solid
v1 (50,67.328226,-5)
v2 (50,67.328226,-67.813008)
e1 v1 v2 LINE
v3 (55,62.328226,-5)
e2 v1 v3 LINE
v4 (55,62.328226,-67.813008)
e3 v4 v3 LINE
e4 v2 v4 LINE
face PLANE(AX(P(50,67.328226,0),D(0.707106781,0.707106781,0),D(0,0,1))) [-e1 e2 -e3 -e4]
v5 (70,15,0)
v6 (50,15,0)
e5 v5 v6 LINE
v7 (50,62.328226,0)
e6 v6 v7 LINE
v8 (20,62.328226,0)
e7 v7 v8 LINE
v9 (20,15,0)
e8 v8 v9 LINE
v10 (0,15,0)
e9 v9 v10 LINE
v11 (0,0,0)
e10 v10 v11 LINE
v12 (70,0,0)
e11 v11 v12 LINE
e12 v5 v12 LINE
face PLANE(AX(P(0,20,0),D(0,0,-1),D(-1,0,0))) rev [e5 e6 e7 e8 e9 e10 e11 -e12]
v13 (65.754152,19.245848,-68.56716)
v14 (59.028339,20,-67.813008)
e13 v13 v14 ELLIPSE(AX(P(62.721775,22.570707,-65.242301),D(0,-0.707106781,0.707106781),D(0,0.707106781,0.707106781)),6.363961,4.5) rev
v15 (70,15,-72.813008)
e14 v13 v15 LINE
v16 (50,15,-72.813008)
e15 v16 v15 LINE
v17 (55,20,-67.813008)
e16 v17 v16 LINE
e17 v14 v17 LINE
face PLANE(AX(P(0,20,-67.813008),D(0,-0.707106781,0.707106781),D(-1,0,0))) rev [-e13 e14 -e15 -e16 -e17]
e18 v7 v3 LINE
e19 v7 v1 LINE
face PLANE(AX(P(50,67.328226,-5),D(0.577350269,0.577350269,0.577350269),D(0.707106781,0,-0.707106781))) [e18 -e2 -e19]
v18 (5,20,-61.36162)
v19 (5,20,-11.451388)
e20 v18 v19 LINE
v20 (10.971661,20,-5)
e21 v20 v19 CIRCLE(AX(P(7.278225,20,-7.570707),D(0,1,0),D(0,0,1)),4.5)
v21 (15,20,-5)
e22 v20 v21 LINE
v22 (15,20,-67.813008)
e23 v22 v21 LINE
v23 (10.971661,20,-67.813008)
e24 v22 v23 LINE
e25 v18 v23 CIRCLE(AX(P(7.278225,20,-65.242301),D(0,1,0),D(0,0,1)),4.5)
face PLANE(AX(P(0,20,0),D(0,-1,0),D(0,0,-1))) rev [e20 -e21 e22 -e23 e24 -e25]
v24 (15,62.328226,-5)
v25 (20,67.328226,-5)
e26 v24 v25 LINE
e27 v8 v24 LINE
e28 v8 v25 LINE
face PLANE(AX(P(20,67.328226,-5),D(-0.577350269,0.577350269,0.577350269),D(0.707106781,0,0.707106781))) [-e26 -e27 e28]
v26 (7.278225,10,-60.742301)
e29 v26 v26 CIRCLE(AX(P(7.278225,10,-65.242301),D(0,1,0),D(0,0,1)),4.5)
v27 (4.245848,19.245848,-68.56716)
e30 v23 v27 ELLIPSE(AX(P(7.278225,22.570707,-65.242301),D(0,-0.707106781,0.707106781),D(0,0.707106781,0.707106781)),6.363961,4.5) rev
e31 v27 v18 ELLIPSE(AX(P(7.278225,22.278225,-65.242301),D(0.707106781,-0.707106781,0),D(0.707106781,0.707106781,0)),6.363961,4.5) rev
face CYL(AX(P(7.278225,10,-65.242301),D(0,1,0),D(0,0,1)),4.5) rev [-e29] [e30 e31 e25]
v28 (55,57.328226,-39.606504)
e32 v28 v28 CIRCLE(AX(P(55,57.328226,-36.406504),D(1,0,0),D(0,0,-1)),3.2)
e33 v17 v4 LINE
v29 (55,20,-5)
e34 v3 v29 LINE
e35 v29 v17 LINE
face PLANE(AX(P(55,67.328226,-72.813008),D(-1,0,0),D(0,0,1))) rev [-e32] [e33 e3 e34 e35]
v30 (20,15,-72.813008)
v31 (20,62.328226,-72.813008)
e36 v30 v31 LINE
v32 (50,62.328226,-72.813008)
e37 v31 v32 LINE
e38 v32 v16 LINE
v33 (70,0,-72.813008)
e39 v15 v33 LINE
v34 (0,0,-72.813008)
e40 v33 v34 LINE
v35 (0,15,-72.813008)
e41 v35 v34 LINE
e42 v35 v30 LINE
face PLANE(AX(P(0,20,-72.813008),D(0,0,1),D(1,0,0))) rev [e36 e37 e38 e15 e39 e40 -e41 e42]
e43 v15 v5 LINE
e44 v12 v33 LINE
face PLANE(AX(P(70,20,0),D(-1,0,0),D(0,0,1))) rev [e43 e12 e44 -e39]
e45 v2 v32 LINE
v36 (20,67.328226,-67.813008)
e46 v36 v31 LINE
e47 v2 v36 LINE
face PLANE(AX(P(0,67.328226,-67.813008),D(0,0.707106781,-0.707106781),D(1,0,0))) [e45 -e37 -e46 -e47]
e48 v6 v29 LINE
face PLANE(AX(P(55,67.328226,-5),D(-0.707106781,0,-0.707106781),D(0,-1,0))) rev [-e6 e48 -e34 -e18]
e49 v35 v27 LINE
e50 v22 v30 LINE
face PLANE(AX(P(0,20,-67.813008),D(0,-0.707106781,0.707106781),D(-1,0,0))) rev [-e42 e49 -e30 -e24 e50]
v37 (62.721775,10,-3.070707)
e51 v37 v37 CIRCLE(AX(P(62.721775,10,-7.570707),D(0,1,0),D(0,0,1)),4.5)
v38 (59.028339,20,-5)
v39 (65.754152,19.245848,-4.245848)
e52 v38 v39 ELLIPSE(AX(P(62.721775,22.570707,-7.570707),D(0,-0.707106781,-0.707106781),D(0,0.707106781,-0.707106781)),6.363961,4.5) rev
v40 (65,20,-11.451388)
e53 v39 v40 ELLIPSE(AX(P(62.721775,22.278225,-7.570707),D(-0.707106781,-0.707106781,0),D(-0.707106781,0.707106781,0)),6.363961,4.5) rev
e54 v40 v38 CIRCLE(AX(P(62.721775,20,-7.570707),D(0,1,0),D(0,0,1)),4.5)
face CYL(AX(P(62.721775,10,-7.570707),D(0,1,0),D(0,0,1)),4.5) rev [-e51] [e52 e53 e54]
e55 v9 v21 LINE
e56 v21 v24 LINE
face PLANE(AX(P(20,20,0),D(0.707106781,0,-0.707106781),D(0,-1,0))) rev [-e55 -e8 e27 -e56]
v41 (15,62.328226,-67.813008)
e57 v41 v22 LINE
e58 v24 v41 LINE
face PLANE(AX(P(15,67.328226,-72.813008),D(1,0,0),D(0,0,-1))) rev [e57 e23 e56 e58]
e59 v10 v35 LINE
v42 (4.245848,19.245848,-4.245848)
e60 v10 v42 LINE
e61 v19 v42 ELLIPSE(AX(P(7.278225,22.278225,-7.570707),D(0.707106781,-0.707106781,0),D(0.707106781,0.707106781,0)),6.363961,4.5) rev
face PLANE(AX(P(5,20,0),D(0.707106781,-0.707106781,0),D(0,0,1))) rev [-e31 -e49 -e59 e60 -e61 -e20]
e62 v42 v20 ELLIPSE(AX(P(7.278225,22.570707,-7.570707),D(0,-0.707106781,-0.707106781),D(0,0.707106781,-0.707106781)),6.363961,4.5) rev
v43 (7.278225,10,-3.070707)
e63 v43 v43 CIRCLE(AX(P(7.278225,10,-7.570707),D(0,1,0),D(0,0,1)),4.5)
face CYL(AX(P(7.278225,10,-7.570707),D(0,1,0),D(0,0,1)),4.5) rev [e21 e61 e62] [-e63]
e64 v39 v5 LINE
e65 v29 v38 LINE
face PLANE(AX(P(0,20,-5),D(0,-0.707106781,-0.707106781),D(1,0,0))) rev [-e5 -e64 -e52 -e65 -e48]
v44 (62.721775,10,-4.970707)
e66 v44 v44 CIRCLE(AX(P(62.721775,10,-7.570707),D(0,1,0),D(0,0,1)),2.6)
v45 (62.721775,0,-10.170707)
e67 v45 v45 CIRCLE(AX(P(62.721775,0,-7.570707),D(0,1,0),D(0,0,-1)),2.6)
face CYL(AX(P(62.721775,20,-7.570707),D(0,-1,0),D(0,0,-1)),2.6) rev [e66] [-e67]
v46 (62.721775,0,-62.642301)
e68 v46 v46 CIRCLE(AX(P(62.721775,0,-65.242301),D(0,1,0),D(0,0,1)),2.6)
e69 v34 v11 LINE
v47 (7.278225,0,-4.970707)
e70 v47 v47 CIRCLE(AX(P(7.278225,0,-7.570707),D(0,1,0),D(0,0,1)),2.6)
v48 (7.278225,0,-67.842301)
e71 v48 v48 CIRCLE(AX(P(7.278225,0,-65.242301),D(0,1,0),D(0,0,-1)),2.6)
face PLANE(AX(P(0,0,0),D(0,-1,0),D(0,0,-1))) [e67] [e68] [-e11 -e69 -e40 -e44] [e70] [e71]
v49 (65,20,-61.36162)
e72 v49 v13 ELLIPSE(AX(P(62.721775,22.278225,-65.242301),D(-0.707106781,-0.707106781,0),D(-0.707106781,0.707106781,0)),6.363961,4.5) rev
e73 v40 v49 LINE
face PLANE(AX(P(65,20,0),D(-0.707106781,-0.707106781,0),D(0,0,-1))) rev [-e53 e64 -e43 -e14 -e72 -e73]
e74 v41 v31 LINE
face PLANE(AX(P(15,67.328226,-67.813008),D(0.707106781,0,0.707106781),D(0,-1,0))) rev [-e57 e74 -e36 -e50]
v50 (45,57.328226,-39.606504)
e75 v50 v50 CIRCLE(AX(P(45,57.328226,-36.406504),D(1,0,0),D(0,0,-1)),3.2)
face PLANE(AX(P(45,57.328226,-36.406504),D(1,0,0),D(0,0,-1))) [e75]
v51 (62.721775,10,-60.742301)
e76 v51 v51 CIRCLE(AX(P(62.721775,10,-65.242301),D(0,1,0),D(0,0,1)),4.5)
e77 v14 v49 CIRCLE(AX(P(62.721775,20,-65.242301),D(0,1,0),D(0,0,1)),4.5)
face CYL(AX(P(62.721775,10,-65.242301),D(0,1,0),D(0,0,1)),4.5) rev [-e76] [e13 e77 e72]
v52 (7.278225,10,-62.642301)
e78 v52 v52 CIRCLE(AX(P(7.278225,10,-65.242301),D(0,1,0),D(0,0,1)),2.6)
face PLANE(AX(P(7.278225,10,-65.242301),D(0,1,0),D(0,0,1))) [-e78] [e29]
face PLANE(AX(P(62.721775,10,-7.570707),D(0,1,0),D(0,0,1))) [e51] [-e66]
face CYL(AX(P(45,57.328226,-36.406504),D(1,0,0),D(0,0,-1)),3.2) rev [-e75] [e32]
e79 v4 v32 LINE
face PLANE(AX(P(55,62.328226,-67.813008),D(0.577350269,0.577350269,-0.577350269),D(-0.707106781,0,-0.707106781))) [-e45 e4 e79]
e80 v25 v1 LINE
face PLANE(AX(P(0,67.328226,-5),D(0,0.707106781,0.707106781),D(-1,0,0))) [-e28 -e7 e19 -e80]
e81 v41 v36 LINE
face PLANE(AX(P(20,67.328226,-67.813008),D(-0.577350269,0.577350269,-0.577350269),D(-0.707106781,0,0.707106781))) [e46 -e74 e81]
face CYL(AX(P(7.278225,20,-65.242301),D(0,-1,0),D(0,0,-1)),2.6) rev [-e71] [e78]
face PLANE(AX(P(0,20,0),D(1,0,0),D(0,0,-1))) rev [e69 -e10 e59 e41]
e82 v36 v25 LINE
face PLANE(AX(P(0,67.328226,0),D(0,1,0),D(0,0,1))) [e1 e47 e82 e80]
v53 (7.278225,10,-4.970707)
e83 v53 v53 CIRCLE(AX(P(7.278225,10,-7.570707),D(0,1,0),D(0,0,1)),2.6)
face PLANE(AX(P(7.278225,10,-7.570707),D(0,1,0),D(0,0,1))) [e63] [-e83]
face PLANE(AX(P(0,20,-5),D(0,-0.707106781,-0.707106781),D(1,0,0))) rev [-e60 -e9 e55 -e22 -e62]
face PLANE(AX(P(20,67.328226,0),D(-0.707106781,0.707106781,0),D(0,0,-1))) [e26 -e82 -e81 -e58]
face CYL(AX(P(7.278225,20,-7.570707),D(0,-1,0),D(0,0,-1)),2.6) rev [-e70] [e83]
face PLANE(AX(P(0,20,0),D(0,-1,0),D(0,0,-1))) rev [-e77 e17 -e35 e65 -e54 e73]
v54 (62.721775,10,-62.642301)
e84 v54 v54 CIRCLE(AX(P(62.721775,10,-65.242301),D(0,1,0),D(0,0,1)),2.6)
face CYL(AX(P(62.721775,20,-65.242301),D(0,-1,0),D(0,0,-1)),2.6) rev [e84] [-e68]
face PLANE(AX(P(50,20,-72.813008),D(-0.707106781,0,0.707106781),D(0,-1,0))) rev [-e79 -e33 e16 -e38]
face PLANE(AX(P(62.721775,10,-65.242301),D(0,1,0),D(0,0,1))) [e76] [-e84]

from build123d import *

# Parameters (mm, degrees)
SKETCH1_W           = 70
SKETCH1_H           = 72.813008
SKETCH1_R           = 2.6
BOSS_EXTRUDE1_DEPTH = 20
SKETCH2_R           = 4.5
CUT_EXTRUDE1_DEPTH  = 10
SKETCH3_W           = 40
SKETCH3_H           = 72.813008
BOSS_EXTRUDE2_DEPTH = 47.328226
SKETCH5_R           = 3.2
CUT_EXTRUDE2_DEPTH  = 10


with BuildPart() as part:
    # Sketch1 → Boss-Extrude1 (new body)
    with BuildSketch(Plane(origin=(0, 0, 0), x_dir=(1, 0, 0), z_dir=(0, 1, 0))):
        with Locations((35, 36.406504)):
            Rectangle(SKETCH1_W, SKETCH1_H)
        with Locations(Location((62.721774771, 65.242301259, 0), (0, 0, 270))):
            Circle(SKETCH1_R, mode=Mode.SUBTRACT)
        with Locations(Location((7.278225229, 65.242301259, 0), (0, 0, 90))):
            Circle(SKETCH1_R, mode=Mode.SUBTRACT)
        with Locations(Location((62.721774771, 7.570706741, 0), (0, 0, 90))):
            Circle(SKETCH1_R, mode=Mode.SUBTRACT)
        with Locations(Location((7.278225229, 7.570706741, 0), (0, 0, 270))):
            Circle(SKETCH1_R, mode=Mode.SUBTRACT)
    extrude(amount=BOSS_EXTRUDE1_DEPTH)

    # Sketch2 → Cut-Extrude1 (cut)
    with BuildSketch(Plane(origin=(0, 20, 0), x_dir=(1, 0, 0), z_dir=(0, 1, 0))):
        with Locations(Location((62.721774771, 65.242301259, 0), (0, 0, 270))):
            Circle(SKETCH2_R)
        with Locations(Location((7.278225229, 65.242301259, 0), (0, 0, 270))):
            Circle(SKETCH2_R)
        with Locations(Location((7.278225229, 7.570706741, 0), (0, 0, 270))):
            Circle(SKETCH2_R)
        with Locations(Location((62.721774771, 7.570706741, 0), (0, 0, 270))):
            Circle(SKETCH2_R)
    extrude(amount=-CUT_EXTRUDE1_DEPTH, mode=Mode.SUBTRACT)

    # Sketch3 → Boss-Extrude2 (add)
    with BuildSketch(Plane(origin=(0, 20, 0), x_dir=(1, 0, 0), z_dir=(0, 1, 0))):
        with Locations((35, 36.406504)):
            Rectangle(SKETCH3_W, SKETCH3_H)
    extrude(amount=BOSS_EXTRUDE2_DEPTH)

    # Sketch5 → Cut-Extrude2 (cut)
    with BuildSketch(Plane(origin=(55, 0, 0), x_dir=(0, 0, -1), z_dir=(1, 0, 0))):
        with Locations((36.406504, 57.328226)):
            Circle(SKETCH5_R)
    extrude(amount=-CUT_EXTRUDE2_DEPTH, mode=Mode.SUBTRACT)

    # Chamfer1
    # the kernel refuses this chamfer: 5 mm, written as the material it takes off along each edge
    with BuildSketch(Plane(origin=(51.666666667, 63.994892667, -3.333333333), x_dir=(0, 0.7071067811865475, -0.7071067811865475), z_dir=(0.5773502691896257, 0.5773502691896257, 0.5773502691896257)), Plane(origin=(18.333333333, 63.994892667, -3.333333333), x_dir=(-0.7071067811865475, 0, -0.7071067811865475), z_dir=(-0.5773502691896257, 0.5773502691896257, 0.5773502691896257))) as chamfer1_piece_1:
        Polygon((-3.535533906, 2.041241452), (3.535533906, 2.041241452), (0, -4.082482905), align=None)
    extrude(amount=6.350852961, mode=Mode.SUBTRACT)
    with BuildSketch(Plane(origin=(51.666666667, 63.994892667, -69.479674667), x_dir=(0, 0.7071067811865475, 0.7071067811865475), z_dir=(0.5773502691896257, 0.5773502691896257, -0.5773502691896257)), Plane(origin=(18.333333333, 63.994892667, -69.479674667), x_dir=(-0.7071067811865472, 0, 0.7071067811865478), z_dir=(-0.5773502691896258, 0.5773502691896258, -0.5773502691896255))) as chamfer1_piece_2:
        Polygon((-3.535533906, -2.041241452), (3.535533906, -2.041241452), (0, 4.082482905), align=None)
    extrude(amount=6.350852961, mode=Mode.SUBTRACT)
    with BuildSketch(Plane(origin=(70, 20, 12.85841494), x_dir=(-0.9996219169112968, 0.027495876610586282, 0), z_dir=(0, 0, -1)), Plane(origin=(15, 67.328226, 12.85841494), x_dir=(-0.027495876610586317, -0.9996219169112968, 0), z_dir=(0, 0, -1))) as chamfer1_piece_3:
        with BuildLine():
            Line((5.143365976, 0), (-0.282735774, -5.135588968))
            Line((-0.282735774, -5.135588968), (-0.382697966, -5.13283938))
            ThreePointArc((-0.382697966, -5.13283938), (-0.170646135, -2.566989148), (-0.099962192, 0.002749588))
            Line((-0.099962192, 0.002749588), (0.002749588, 0.099962192))
            ThreePointArc((0.002749588, 0.099962192), (2.572488324, 0.029278248), (5.146115564, 0.099962192))
            Line((5.146115564, 0.099962192), (5.143365976, 0))
        make_face()
    extrude(amount=98.52983788, mode=Mode.SUBTRACT)
    with BuildSketch(Plane(origin=(82.85841494, 20, -72.813008), x_dir=(0, 0.027495876610586282, 0.9996219169112968), z_dir=(-1, 0, 0)), Plane(origin=(15, 20, -72.813008), x_dir=(0, 0.027495876610586282, 0.9996219169112968), z_dir=(-1, 0, 0))) as chamfer1_piece_4:
        with BuildLine():
            Line((5.143365976, 0), (-0.282735774, -5.135588968))
            Line((-0.282735774, -5.135588968), (-0.382697966, -5.13283938))
            ThreePointArc((-0.382697966, -5.13283938), (-0.170646135, -2.566989148), (-0.099962192, 0.002749588))
            Line((-0.099962192, 0.002749588), (0.002749588, 0.099962192))
            ThreePointArc((0.002749588, 0.099962192), (2.572488324, 0.029278248), (5.146115564, 0.099962192))
            Line((5.146115564, 0.099962192), (5.143365976, 0))
        make_face()
    extrude(amount=27.85841494, mode=Mode.SUBTRACT)
    with BuildSketch(Plane(origin=(0, 20, -85.67142294), x_dir=(-0.027495876610586372, -0.9996219169112968, 0), z_dir=(0, 0, 1)), Plane(origin=(55, 67.328226, -85.67142294), x_dir=(-0.9996219169112968, 0.0274958766105877, 0), z_dir=(0, 0, 1))) as chamfer1_piece_5:
        with BuildLine():
            Line((5.143365976, 0), (-0.282735774, 5.135588968))
            Line((-0.282735774, 5.135588968), (-0.382697966, 5.13283938))
            ThreePointArc((-0.382697966, 5.13283938), (-0.170646135, 2.566989148), (-0.099962192, -0.002749588))
            Line((-0.099962192, -0.002749588), (0.002749588, -0.099962192))
            ThreePointArc((0.002749588, -0.099962192), (2.572488324, -0.029278248), (5.146115564, -0.099962192))
            Line((5.146115564, -0.099962192), (5.143365976, 0))
        make_face()
    extrude(amount=98.52983788, mode=Mode.SUBTRACT)
    with BuildSketch(Plane(origin=(55, 20, 0), x_dir=(0, -0.9996219169112968, 0.027495876610586372), z_dir=(1, 0, 0)), Plane(origin=(-12.85841494, 20, 0), x_dir=(0, -0.9996219169112968, 0.027495876610586372), z_dir=(1, 0, 0))) as chamfer1_piece_6:
        with BuildLine():
            Line((5.143365976, 0), (-0.282735774, 5.135588968))
            Line((-0.282735774, 5.135588968), (-0.382697966, 5.13283938))
            ThreePointArc((-0.382697966, 5.13283938), (-0.170646135, 2.566989148), (-0.099962192, -0.002749588))
            Line((-0.099962192, -0.002749588), (0.002749588, -0.099962192))
            ThreePointArc((0.002749588, -0.099962192), (2.572488324, -0.029278248), (5.146115564, -0.099962192))
            Line((5.146115564, -0.099962192), (5.143365976, 0))
        make_face()
    extrude(amount=27.85841494, mode=Mode.SUBTRACT)
    with BuildSketch(Plane(origin=(55, 20, 0), x_dir=(-0.9996219169112968, 0, 0.027495876610586372), z_dir=(0, 1, 0)), Plane(origin=(55, 20, -72.813008), x_dir=(0.027495876610586282, 0, 0.9996219169112968), z_dir=(0, 1, 0))) as chamfer1_piece_7:
        with BuildLine():
            Line((5.143365976, 0), (-0.282735774, -5.135588968))
            Line((-0.282735774, -5.135588968), (-0.382697966, -5.13283938))
            ThreePointArc((-0.382697966, -5.13283938), (-0.170646135, -2.566989148), (-0.099962192, 0.002749588))
            Line((-0.099962192, 0.002749588), (0.002749588, 0.099962192))
            ThreePointArc((0.002749588, 0.099962192), (2.572488324, 0.029278248), (5.146115564, 0.099962192))
            Line((5.146115564, 0.099962192), (5.143365976, 0))
        make_face()
    extrude(amount=60.18664094, mode=Mode.SUBTRACT)
    with BuildSketch(Plane(origin=(15, 20, -72.813008), x_dir=(-0.027495876610586282, 0, 0.9996219169112968), z_dir=(0, 1, 0)), Plane(origin=(15, 20, 0), x_dir=(0.9996219169112968, 0, 0.027495876610586372), z_dir=(0, 1, 0))) as chamfer1_piece_8:
        with BuildLine():
            Line((5.143365976, 0), (-0.282735774, 5.135588968))
            Line((-0.282735774, 5.135588968), (-0.382697966, 5.13283938))
            ThreePointArc((-0.382697966, 5.13283938), (-0.170646135, 2.566989148), (-0.099962192, -0.002749588))
            Line((-0.099962192, -0.002749588), (0.002749588, -0.099962192))
            ThreePointArc((0.002749588, -0.099962192), (2.572488324, -0.029278248), (5.146115564, -0.099962192))
            Line((5.146115564, -0.099962192), (5.143365976, 0))
        make_face()
    extrude(amount=60.18664094, mode=Mode.SUBTRACT)
    with BuildSketch(Plane(origin=(2.14158506, 67.328226, -72.813008), x_dir=(0, 0.027495876610587663, 0.9996219169112968), z_dir=(1, 0, 0))) as chamfer1_piece_9:
        with BuildLine():
            Line((5.143365976, 0), (-0.282735774, 5.135588968))
            Line((-0.282735774, 5.135588968), (-0.382697966, 5.13283938))
            ThreePointArc((-0.382697966, 5.13283938), (-0.170646135, 2.566989148), (-0.099962192, -0.002749588))
            Line((-0.099962192, -0.002749588), (0.002749588, -0.099962192))
            ThreePointArc((0.002749588, -0.099962192), (2.572488324, -0.029278248), (5.146115564, -0.099962192))
            Line((5.146115564, -0.099962192), (5.143365976, 0))
        make_face()
    extrude(amount=65.71682988, mode=Mode.SUBTRACT)
    with BuildSketch(Plane(origin=(67.85841494, 67.328226, 0), x_dir=(0, -0.9996219169112968, 0.027495876610586372), z_dir=(-1, 0, 0))) as chamfer1_piece_10:
        with BuildLine():
            Line((5.143365976, 0), (-0.282735774, -5.135588968))
            Line((-0.282735774, -5.135588968), (-0.382697966, -5.13283938))
            ThreePointArc((-0.382697966, -5.13283938), (-0.170646135, -2.566989148), (-0.099962192, 0.002749588))
            Line((-0.099962192, 0.002749588), (0.002749588, 0.099962192))
            ThreePointArc((0.002749588, 0.099962192), (2.572488324, 0.029278248), (5.146115564, 0.099962192))
            Line((5.146115564, 0.099962192), (5.143365976, 0))
        make_face()
    extrude(amount=65.71682988, mode=Mode.SUBTRACT)
    with BuildSketch(Plane(origin=(55, 7.14158506, -72.813008), x_dir=(0.027495876610586282, 0, 0.9996219169112968), z_dir=(0, 1, 0))) as chamfer1_piece_11a_section:
        with BuildLine():
            Line((5.143365976, 0), (-0.282735774, -5.135588968))
            Line((-0.282735774, -5.135588968), (-0.382697966, -5.13283938))
            ThreePointArc((-0.382697966, -5.13283938), (-0.170646135, -2.566989148), (-0.099962192, 0.002749588))
            Line((-0.099962192, 0.002749588), (0.002749588, 0.099962192))
            ThreePointArc((0.002749588, 0.099962192), (2.572488324, 0.029278248), (5.146115564, 0.099962192))
            Line((5.146115564, 0.099962192), (5.143365976, 0))
        make_face()
    chamfer1_piece_11a = extrude(amount=73.04505588, mode=Mode.PRIVATE)
    chamfer1_piece_11a = split(chamfer1_piece_11a, bisect_by=Plane(origin=(53.351031866, 20, -71.164039866), z_dir=(0, -1, 0)), keep=Keep.TOP, mode=Mode.PRIVATE)
    with BuildSketch(Plane(origin=(82.85841494, 20, -72.813008), x_dir=(0, 0.027495876610586282, 0.9996219169112968), z_dir=(-1, 0, 0))) as chamfer1_piece_11b_section:
        with BuildLine():
            Line((5.143365976, 0), (-0.282735774, -5.135588968))
            Line((-0.282735774, -5.135588968), (-0.382697966, -5.13283938))
            ThreePointArc((-0.382697966, -5.13283938), (-0.170646135, -2.566989148), (-0.099962192, 0.002749588))
            Line((-0.099962192, 0.002749588), (0.002749588, 0.099962192))
            ThreePointArc((0.002749588, 0.099962192), (2.572488324, 0.029278248), (5.146115564, 0.099962192))
            Line((5.146115564, 0.099962192), (5.143365976, 0))
        make_face()
    chamfer1_piece_11b = extrude(amount=40.71682988, mode=Mode.PRIVATE)
    chamfer1_piece_11b = split(chamfer1_piece_11b, bisect_by=Plane(origin=(55, 18.351031866, -71.164039866), z_dir=(-1, 0, 0)), keep=Keep.TOP, mode=Mode.PRIVATE)
    chamfer1_piece_11 = chamfer1_piece_11a & chamfer1_piece_11b
    add(chamfer1_piece_11, mode=Mode.SUBTRACT)
    with BuildSketch(Plane(origin=(55, 7.14158506, 0), x_dir=(-0.9996219169112968, 0, 0.027495876610586372), z_dir=(0, 1, 0))) as chamfer1_piece_12a_section:
        with BuildLine():
            Line((5.143365976, 0), (-0.282735774, -5.135588968))
            Line((-0.282735774, -5.135588968), (-0.382697966, -5.13283938))
            ThreePointArc((-0.382697966, -5.13283938), (-0.170646135, -2.566989148), (-0.099962192, 0.002749588))
            Line((-0.099962192, 0.002749588), (0.002749588, 0.099962192))
            ThreePointArc((0.002749588, 0.099962192), (2.572488324, 0.029278248), (5.146115564, 0.099962192))
            Line((5.146115564, 0.099962192), (5.143365976, 0))
        make_face()
    chamfer1_piece_12a = extrude(amount=73.04505588, mode=Mode.PRIVATE)
    chamfer1_piece_12a = split(chamfer1_piece_12a, bisect_by=Plane(origin=(53.351031866, 20, -1.648968134), z_dir=(0, -1, 0)), keep=Keep.TOP, mode=Mode.PRIVATE)
    with BuildSketch(Plane(origin=(42.14158506, 20, 0), x_dir=(0, -0.9996219169112968, 0.027495876610586372), z_dir=(1, 0, 0))) as chamfer1_piece_12b_section:
        with BuildLine():
            Line((5.143365976, 0), (-0.282735774, 5.135588968))
            Line((-0.282735774, 5.135588968), (-0.382697966, 5.13283938))
            ThreePointArc((-0.382697966, 5.13283938), (-0.170646135, 2.566989148), (-0.099962192, -0.002749588))
            Line((-0.099962192, -0.002749588), (0.002749588, -0.099962192))
            ThreePointArc((0.002749588, -0.099962192), (2.572488324, -0.029278248), (5.146115564, -0.099962192))
            Line((5.146115564, -0.099962192), (5.143365976, 0))
        make_face()
    chamfer1_piece_12b = extrude(amount=40.71682988, mode=Mode.PRIVATE)
    chamfer1_piece_12b = split(chamfer1_piece_12b, bisect_by=Plane(origin=(55, 18.351031866, -1.648968134), z_dir=(-1, 0, 0)), keep=Keep.TOP, mode=Mode.PRIVATE)
    chamfer1_piece_12 = chamfer1_piece_12a & chamfer1_piece_12b
    add(chamfer1_piece_12, mode=Mode.SUBTRACT)
    with BuildSketch(Plane(origin=(27.85841494, 20, -72.813008), x_dir=(0, 0.027495876610586282, 0.9996219169112968), z_dir=(-1, 0, 0))) as chamfer1_piece_13a_section:
        with BuildLine():
            Line((5.143365976, 0), (-0.282735774, -5.135588968))
            Line((-0.282735774, -5.135588968), (-0.382697966, -5.13283938))
            ThreePointArc((-0.382697966, -5.13283938), (-0.170646135, -2.566989148), (-0.099962192, 0.002749588))
            Line((-0.099962192, 0.002749588), (0.002749588, 0.099962192))
            ThreePointArc((0.002749588, 0.099962192), (2.572488324, 0.029278248), (5.146115564, 0.099962192))
            Line((5.146115564, 0.099962192), (5.143365976, 0))
        make_face()
    chamfer1_piece_13a = extrude(amount=40.71682988, mode=Mode.PRIVATE)
    chamfer1_piece_13a = split(chamfer1_piece_13a, bisect_by=Plane(origin=(15, 18.351031866, -71.164039866), z_dir=(1, 0, 0)), keep=Keep.TOP, mode=Mode.PRIVATE)
    with BuildSketch(Plane(origin=(15, 7.14158506, -72.813008), x_dir=(-0.027495876610586282, 0, 0.9996219169112968), z_dir=(0, 1, 0))) as chamfer1_piece_13b_section:
        with BuildLine():
            Line((5.143365976, 0), (-0.282735774, 5.135588968))
            Line((-0.282735774, 5.135588968), (-0.382697966, 5.13283938))
            ThreePointArc((-0.382697966, 5.13283938), (-0.170646135, 2.566989148), (-0.099962192, -0.002749588))
            Line((-0.099962192, -0.002749588), (0.002749588, -0.099962192))
            ThreePointArc((0.002749588, -0.099962192), (2.572488324, -0.029278248), (5.146115564, -0.099962192))
            Line((5.146115564, -0.099962192), (5.143365976, 0))
        make_face()
    chamfer1_piece_13b = extrude(amount=73.04505588, mode=Mode.PRIVATE)
    chamfer1_piece_13b = split(chamfer1_piece_13b, bisect_by=Plane(origin=(16.648968134, 20, -71.164039866), z_dir=(0, -1, 0)), keep=Keep.TOP, mode=Mode.PRIVATE)
    chamfer1_piece_13 = chamfer1_piece_13a & chamfer1_piece_13b
    add(chamfer1_piece_13, mode=Mode.SUBTRACT)
    with BuildSketch(Plane(origin=(-12.85841494, 20, 0), x_dir=(0, -0.9996219169112968, 0.027495876610586372), z_dir=(1, 0, 0))) as chamfer1_piece_14a_section:
        with BuildLine():
            Line((5.143365976, 0), (-0.282735774, 5.135588968))
            Line((-0.282735774, 5.135588968), (-0.382697966, 5.13283938))
            ThreePointArc((-0.382697966, 5.13283938), (-0.170646135, 2.566989148), (-0.099962192, -0.002749588))
            Line((-0.099962192, -0.002749588), (0.002749588, -0.099962192))
            ThreePointArc((0.002749588, -0.099962192), (2.572488324, -0.029278248), (5.146115564, -0.099962192))
            Line((5.146115564, -0.099962192), (5.143365976, 0))
        make_face()
    chamfer1_piece_14a = extrude(amount=40.71682988, mode=Mode.PRIVATE)
    chamfer1_piece_14a = split(chamfer1_piece_14a, bisect_by=Plane(origin=(15, 18.351031866, -1.648968134), z_dir=(1, 0, 0)), keep=Keep.TOP, mode=Mode.PRIVATE)
    with BuildSketch(Plane(origin=(15, 7.14158506, 0), x_dir=(0.9996219169112968, 0, 0.027495876610586372), z_dir=(0, 1, 0))) as chamfer1_piece_14b_section:
        with BuildLine():
            Line((5.143365976, 0), (-0.282735774, 5.135588968))
            Line((-0.282735774, 5.135588968), (-0.382697966, 5.13283938))
            ThreePointArc((-0.382697966, 5.13283938), (-0.170646135, 2.566989148), (-0.099962192, -0.002749588))
            Line((-0.099962192, -0.002749588), (0.002749588, -0.099962192))
            ThreePointArc((0.002749588, -0.099962192), (2.572488324, -0.029278248), (5.146115564, -0.099962192))
            Line((5.146115564, -0.099962192), (5.143365976, 0))
        make_face()
    chamfer1_piece_14b = extrude(amount=73.04505588, mode=Mode.PRIVATE)
    chamfer1_piece_14b = split(chamfer1_piece_14b, bisect_by=Plane(origin=(16.648968134, 20, -1.648968134), z_dir=(0, -1, 0)), keep=Keep.TOP, mode=Mode.PRIVATE)
    chamfer1_piece_14 = chamfer1_piece_14a & chamfer1_piece_14b
    add(chamfer1_piece_14, mode=Mode.SUBTRACT)


solid = part.part
